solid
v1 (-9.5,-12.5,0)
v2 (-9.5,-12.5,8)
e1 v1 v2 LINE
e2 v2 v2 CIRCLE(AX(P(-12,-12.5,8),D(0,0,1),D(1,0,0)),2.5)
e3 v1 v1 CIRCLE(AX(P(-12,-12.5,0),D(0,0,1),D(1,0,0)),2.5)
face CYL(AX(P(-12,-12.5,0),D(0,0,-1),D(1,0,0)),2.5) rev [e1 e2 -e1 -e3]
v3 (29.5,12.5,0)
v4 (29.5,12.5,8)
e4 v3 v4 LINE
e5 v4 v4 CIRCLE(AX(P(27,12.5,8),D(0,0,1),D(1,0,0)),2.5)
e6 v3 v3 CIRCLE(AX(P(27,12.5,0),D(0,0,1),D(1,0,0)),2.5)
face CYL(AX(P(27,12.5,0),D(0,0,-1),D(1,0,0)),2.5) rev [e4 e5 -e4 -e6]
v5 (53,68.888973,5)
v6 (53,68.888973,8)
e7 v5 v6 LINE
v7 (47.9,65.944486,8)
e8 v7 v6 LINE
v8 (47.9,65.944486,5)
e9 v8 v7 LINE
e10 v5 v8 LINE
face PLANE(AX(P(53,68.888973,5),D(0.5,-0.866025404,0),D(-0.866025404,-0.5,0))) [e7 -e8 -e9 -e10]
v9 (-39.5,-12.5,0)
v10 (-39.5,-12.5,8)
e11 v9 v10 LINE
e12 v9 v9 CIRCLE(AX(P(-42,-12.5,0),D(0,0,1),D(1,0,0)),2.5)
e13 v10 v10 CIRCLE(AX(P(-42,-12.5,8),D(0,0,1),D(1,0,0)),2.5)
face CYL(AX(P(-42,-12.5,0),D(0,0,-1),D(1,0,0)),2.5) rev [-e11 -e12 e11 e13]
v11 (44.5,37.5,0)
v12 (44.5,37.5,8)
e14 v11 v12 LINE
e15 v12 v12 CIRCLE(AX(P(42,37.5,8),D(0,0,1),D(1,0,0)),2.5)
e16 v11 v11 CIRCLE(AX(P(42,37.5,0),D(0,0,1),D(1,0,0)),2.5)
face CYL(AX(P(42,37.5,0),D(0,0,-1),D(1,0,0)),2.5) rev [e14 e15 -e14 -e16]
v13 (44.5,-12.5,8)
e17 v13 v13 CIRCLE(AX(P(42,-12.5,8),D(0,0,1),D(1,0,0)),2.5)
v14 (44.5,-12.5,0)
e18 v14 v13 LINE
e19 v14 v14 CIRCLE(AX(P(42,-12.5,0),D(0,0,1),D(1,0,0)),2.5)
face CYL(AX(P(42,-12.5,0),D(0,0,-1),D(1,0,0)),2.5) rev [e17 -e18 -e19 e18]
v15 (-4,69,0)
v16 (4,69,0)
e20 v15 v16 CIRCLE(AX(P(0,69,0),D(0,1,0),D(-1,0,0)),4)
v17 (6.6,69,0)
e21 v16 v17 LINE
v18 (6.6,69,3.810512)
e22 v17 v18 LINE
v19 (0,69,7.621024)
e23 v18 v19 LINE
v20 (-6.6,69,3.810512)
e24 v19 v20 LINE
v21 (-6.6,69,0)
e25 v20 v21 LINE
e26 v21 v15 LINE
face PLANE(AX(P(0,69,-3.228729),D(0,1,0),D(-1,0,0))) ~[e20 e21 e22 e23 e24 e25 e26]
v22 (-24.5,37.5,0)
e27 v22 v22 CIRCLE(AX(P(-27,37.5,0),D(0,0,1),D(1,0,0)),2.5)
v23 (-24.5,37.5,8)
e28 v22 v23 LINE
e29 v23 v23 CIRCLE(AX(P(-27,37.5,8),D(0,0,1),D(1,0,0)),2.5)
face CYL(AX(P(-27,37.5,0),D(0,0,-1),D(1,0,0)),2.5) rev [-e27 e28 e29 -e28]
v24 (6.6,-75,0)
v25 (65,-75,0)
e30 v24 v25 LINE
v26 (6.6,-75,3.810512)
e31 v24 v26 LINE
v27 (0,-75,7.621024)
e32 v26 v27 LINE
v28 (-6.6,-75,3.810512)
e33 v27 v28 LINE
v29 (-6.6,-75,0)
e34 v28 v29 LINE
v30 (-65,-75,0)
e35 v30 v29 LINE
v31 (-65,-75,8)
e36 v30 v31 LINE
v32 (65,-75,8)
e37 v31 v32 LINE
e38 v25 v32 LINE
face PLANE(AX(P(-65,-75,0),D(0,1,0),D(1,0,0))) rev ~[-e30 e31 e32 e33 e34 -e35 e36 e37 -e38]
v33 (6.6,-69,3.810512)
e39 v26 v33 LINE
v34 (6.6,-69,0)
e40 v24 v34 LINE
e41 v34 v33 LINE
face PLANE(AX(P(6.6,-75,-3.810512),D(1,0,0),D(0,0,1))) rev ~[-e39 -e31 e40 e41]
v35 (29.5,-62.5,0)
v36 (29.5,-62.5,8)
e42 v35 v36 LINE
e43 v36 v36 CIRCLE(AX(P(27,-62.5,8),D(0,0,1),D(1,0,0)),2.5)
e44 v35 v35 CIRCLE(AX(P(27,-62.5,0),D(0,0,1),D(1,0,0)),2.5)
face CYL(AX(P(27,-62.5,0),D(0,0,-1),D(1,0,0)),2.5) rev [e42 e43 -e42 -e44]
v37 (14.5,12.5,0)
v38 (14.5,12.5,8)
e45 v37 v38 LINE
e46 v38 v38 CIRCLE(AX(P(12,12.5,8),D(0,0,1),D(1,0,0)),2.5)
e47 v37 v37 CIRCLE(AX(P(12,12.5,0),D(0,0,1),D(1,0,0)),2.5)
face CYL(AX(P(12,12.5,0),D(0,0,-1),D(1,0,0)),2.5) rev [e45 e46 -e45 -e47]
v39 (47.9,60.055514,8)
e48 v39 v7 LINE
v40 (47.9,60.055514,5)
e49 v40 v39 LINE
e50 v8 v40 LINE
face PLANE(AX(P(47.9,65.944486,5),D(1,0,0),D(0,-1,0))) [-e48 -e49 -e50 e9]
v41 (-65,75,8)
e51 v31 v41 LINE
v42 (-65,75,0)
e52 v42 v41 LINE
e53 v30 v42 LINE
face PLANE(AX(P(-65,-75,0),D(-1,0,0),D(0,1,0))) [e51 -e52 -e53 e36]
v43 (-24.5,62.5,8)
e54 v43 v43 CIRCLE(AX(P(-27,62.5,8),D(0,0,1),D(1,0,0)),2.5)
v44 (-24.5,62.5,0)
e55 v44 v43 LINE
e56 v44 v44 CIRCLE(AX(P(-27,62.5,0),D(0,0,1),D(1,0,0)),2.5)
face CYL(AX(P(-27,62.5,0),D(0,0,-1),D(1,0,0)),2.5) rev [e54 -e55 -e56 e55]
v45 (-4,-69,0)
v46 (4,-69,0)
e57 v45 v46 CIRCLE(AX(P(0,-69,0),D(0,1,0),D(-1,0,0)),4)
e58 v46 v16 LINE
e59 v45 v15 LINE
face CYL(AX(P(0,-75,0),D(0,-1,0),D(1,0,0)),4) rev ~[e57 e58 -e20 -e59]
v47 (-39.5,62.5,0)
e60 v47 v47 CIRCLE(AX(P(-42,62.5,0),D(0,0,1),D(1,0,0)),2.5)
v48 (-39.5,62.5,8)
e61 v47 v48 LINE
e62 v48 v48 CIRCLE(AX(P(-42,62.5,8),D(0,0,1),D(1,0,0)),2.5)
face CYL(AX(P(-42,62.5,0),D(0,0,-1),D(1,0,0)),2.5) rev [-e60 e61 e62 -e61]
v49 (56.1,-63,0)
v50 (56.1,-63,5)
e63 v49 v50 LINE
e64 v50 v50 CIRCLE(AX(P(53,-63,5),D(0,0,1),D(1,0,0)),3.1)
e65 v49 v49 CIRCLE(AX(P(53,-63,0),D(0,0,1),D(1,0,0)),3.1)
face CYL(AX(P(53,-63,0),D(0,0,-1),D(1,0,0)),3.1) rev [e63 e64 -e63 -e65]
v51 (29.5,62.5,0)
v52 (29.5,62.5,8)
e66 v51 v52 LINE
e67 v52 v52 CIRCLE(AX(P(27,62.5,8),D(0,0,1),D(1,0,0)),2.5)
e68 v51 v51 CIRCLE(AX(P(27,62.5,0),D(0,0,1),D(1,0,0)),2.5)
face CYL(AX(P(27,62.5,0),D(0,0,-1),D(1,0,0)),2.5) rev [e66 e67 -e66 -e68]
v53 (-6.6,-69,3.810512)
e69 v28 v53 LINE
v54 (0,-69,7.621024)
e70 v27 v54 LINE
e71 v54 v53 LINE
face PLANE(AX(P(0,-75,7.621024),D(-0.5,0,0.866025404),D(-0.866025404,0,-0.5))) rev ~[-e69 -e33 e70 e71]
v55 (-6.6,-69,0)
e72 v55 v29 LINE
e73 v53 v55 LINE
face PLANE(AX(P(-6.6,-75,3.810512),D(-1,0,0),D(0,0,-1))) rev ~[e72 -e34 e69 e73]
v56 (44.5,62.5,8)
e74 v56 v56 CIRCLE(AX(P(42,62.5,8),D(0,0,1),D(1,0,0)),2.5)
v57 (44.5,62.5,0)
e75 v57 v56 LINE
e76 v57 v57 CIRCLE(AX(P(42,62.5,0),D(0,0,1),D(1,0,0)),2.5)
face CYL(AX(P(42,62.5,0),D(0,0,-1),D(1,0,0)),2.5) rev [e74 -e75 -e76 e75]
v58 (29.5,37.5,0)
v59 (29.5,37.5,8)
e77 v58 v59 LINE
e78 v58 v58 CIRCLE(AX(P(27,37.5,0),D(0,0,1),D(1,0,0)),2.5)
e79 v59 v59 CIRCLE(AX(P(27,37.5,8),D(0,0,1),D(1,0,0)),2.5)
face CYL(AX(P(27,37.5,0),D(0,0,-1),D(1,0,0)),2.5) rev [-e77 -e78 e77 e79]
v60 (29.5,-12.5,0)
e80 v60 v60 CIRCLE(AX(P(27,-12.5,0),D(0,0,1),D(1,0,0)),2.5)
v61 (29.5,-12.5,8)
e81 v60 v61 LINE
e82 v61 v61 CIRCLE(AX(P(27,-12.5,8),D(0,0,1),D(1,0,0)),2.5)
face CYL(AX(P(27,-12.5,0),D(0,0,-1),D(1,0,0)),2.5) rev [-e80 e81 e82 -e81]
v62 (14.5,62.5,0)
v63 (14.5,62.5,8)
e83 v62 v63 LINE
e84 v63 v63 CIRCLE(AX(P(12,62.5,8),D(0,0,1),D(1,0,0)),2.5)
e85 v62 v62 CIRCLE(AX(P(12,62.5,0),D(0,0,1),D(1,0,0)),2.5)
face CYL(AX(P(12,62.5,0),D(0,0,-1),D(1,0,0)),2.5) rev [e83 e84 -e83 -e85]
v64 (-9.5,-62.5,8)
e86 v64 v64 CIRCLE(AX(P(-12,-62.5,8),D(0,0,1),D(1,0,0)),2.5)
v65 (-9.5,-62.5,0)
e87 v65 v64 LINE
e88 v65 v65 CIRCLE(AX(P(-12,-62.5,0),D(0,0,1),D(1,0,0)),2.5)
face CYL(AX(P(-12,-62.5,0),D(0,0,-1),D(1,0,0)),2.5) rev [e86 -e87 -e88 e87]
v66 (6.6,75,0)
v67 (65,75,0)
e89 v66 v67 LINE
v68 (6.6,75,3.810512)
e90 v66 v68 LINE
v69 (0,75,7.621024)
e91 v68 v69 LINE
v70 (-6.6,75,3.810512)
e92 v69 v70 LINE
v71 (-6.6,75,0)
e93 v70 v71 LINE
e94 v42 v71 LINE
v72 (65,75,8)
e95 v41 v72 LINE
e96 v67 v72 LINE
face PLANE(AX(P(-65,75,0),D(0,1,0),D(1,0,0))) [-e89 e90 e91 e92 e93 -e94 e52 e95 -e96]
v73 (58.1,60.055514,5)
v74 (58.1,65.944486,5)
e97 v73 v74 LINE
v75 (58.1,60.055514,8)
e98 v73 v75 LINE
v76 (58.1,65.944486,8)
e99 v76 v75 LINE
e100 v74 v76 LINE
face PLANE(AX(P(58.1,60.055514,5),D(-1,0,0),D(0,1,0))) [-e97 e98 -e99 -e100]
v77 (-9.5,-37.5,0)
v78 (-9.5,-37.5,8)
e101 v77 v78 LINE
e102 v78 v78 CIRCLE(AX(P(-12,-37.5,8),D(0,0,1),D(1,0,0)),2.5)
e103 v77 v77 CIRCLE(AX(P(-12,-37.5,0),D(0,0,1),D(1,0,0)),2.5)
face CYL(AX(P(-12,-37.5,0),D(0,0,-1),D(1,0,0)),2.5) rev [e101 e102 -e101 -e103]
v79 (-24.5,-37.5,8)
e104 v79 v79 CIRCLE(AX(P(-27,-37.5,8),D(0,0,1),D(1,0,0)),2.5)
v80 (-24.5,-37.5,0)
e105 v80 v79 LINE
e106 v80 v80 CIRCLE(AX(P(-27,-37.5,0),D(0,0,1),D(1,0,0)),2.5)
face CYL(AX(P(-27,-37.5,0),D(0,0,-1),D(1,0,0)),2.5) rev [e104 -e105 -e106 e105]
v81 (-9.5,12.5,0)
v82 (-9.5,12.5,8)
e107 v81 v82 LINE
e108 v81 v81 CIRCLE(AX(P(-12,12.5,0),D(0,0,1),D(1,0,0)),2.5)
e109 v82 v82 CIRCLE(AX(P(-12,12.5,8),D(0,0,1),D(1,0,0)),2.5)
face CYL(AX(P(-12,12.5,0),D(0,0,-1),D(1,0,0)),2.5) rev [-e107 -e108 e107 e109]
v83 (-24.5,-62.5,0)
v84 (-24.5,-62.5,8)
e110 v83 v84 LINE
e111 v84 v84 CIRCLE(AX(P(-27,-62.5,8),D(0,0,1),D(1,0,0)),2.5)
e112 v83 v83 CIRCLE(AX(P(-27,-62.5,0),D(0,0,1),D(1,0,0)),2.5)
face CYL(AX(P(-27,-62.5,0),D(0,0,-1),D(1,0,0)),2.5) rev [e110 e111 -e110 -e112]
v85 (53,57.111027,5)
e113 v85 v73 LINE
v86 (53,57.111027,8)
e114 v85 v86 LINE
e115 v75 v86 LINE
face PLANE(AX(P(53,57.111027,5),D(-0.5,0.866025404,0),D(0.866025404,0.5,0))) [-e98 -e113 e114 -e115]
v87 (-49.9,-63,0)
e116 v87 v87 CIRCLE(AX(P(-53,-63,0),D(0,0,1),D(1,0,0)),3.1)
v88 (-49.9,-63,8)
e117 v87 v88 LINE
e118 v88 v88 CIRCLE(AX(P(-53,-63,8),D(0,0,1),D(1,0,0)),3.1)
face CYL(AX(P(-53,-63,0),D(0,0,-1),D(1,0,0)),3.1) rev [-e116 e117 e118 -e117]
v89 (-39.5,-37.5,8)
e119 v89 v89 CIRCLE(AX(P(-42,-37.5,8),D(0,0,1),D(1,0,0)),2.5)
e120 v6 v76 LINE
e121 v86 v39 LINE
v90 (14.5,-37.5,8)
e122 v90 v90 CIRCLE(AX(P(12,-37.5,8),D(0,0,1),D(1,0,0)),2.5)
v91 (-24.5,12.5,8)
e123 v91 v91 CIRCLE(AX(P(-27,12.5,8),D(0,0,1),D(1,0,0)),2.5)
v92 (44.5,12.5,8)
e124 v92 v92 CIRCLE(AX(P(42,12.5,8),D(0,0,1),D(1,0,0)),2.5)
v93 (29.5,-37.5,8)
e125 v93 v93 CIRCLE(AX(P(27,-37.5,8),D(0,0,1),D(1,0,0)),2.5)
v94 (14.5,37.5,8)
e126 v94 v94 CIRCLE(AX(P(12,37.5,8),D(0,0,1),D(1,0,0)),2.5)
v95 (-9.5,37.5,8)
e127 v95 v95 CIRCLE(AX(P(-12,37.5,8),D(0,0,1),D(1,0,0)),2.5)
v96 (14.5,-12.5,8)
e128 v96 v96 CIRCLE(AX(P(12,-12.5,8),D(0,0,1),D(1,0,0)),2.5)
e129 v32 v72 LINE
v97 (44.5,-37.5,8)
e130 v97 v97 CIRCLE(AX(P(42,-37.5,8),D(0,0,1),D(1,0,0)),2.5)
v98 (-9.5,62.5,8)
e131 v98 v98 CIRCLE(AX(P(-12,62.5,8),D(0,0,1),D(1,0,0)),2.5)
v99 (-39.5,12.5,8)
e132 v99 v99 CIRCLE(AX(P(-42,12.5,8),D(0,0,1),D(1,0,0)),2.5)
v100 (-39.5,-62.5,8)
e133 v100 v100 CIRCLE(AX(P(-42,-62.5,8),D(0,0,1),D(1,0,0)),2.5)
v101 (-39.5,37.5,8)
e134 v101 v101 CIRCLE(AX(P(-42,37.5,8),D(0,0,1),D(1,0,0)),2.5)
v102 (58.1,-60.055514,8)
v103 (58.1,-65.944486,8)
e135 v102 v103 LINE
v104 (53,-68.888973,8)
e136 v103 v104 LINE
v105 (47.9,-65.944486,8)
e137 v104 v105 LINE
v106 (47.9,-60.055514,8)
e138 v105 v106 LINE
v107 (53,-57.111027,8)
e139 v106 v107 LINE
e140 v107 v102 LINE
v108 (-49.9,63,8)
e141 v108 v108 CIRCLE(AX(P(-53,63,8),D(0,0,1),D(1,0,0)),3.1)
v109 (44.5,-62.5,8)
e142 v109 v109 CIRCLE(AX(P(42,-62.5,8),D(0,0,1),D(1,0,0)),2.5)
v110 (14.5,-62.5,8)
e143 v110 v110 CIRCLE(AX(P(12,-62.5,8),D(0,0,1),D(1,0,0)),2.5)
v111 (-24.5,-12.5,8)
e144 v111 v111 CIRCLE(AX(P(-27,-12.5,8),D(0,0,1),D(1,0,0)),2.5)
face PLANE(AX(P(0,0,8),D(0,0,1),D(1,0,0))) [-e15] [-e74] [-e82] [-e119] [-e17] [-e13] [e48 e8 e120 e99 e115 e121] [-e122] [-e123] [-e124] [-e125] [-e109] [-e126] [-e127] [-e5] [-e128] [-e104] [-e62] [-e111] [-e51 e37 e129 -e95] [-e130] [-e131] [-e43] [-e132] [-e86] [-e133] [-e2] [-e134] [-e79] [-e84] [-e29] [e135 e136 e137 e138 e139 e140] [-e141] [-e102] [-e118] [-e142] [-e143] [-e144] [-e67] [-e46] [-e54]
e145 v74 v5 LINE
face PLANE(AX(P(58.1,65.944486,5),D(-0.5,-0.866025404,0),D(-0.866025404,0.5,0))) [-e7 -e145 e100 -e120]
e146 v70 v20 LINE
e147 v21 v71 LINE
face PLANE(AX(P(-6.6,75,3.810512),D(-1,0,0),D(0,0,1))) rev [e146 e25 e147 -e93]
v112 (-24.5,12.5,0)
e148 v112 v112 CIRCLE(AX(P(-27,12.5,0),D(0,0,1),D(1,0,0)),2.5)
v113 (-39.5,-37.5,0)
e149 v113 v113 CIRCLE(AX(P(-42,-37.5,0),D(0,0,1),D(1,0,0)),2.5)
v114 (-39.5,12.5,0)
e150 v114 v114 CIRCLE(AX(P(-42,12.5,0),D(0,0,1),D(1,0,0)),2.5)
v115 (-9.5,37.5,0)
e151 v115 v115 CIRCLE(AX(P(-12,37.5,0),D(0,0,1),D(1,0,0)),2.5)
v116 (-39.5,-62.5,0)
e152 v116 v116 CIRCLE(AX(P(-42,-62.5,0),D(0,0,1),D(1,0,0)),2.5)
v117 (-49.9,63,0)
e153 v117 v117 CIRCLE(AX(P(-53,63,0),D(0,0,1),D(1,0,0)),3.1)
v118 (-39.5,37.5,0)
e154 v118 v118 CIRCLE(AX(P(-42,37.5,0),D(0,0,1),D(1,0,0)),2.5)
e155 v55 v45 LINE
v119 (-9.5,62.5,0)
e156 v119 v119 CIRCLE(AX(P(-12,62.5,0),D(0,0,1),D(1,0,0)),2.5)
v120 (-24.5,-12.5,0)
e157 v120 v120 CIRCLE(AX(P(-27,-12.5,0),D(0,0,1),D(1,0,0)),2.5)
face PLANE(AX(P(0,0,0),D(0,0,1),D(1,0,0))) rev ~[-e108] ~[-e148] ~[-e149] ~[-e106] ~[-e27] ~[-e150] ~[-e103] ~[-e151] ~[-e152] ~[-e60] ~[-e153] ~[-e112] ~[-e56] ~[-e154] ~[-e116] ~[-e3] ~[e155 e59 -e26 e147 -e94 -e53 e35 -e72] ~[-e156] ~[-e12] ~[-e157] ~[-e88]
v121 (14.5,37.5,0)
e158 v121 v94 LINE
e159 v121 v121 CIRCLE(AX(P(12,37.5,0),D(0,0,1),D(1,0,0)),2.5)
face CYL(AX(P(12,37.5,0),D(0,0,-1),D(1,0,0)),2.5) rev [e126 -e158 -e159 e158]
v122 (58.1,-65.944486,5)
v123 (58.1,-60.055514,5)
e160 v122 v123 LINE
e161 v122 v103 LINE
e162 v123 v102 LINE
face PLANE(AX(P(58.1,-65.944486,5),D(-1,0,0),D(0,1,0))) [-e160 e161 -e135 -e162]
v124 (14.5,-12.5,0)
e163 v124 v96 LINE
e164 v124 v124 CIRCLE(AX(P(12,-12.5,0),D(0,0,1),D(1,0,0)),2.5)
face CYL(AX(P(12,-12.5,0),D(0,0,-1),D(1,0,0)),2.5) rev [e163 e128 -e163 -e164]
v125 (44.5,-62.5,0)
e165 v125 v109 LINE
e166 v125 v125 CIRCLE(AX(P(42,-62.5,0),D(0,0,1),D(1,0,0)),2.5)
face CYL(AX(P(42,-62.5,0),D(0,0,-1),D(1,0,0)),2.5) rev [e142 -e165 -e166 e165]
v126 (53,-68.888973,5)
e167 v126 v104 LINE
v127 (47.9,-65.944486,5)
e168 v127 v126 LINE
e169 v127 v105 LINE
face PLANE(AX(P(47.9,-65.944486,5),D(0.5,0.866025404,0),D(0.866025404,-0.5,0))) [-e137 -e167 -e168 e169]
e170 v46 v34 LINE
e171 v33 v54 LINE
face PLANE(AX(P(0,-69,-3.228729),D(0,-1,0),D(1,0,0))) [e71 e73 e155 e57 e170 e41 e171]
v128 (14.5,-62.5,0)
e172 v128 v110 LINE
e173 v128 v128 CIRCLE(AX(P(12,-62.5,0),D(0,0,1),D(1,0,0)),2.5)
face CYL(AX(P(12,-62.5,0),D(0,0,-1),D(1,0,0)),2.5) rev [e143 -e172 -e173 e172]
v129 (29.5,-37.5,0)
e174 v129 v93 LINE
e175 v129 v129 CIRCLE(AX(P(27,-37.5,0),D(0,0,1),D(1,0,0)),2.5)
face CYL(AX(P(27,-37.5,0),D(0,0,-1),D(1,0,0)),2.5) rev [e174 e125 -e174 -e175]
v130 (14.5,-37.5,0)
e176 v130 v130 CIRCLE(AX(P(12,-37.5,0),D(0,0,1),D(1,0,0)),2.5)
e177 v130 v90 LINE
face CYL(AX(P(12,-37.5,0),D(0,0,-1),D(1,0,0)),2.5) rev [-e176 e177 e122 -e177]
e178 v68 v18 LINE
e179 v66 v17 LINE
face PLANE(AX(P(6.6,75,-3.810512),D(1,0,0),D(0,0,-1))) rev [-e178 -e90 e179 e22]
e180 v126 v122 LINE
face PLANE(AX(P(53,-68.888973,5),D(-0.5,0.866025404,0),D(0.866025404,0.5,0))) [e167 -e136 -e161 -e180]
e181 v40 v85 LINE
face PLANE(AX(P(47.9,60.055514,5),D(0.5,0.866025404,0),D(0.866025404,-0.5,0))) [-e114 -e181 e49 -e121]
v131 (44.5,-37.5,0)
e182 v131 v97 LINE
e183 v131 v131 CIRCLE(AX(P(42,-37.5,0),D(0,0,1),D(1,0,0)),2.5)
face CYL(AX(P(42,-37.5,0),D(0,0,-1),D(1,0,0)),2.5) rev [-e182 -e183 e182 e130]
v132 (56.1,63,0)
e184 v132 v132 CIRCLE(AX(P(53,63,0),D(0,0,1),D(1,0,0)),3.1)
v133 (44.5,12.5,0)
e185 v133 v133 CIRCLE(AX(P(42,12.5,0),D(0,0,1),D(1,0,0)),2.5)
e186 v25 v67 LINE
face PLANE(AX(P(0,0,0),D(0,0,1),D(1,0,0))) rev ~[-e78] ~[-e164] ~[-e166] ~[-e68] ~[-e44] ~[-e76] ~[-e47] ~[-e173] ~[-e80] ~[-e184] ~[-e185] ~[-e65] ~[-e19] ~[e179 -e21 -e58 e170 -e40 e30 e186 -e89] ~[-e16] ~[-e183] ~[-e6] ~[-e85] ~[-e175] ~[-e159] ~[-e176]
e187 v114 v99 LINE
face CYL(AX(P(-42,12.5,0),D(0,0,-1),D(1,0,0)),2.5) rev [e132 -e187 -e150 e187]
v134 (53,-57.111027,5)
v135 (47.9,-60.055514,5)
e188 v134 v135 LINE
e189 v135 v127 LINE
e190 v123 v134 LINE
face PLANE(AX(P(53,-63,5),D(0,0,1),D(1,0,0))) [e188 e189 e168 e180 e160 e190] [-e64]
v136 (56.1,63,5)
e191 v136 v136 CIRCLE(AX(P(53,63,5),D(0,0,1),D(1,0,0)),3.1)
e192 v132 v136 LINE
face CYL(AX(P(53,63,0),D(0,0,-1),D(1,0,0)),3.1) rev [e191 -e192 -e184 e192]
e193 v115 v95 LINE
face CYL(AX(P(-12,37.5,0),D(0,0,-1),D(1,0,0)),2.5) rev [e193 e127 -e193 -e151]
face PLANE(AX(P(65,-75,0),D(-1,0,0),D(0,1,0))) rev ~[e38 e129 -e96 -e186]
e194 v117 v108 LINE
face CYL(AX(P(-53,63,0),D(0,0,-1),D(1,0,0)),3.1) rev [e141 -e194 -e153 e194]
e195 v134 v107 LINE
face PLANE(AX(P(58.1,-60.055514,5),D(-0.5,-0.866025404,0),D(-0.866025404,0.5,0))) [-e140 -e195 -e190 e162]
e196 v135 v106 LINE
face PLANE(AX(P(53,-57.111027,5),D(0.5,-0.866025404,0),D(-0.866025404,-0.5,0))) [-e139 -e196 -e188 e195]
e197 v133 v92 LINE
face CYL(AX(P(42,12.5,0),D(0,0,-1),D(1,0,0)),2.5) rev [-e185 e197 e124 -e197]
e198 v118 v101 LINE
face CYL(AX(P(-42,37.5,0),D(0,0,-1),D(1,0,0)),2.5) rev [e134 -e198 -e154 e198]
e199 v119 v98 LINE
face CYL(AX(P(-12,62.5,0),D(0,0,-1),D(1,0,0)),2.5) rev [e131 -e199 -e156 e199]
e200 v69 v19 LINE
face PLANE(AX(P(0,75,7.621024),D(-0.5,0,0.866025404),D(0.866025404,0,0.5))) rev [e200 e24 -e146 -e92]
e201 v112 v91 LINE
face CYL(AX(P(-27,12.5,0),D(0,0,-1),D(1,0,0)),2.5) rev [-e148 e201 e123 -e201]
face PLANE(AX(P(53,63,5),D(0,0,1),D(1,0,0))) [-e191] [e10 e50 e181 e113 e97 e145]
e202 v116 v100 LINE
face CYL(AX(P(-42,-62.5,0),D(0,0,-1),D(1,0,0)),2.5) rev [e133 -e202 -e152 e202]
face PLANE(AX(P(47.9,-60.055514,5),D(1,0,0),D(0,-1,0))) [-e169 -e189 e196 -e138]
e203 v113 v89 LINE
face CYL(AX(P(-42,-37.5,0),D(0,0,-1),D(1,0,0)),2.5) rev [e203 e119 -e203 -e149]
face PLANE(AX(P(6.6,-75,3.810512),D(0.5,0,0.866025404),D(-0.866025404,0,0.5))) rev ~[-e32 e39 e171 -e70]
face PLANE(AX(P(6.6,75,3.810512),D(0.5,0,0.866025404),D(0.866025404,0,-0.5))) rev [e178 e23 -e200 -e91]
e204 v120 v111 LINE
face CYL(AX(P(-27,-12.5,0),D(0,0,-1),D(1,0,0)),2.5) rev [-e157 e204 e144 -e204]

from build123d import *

# Parameters (mm, degrees)
F0_W     = 130
F0_H     = 150
F0_R     = 3.1
F0_R_2   = 2.5
F1_DEPTH = 8
F2_START = 5
F2_DEPTH = 20
F4_DEPTH = 150.001
F5_DEPTH = 6


# Not quite as in the source:
# - a pattern or mirror of a feature is missing from the dataset's text; its kind, count and spacing are read off the source's solid


with BuildPart() as f1:
    # F0 (on Top) → F1 (new body)
    with BuildSketch(Plane.XY):
        Rectangle(F0_W, F0_H)
        with Locations((-53, -63)):
            Circle(F0_R, mode=Mode.SUBTRACT)
        with Locations((-42, -62.5)):
            Circle(F0_R_2, mode=Mode.SUBTRACT)
        with Locations((-27, -62.5)):
            Circle(F0_R_2, mode=Mode.SUBTRACT)
        with Locations((-12, -62.5)):
            Circle(F0_R_2, mode=Mode.SUBTRACT)
        with Locations((-42, -37.5)):
            Circle(F0_R_2, mode=Mode.SUBTRACT)
        with Locations((-42, -12.5)):
            Circle(F0_R_2, mode=Mode.SUBTRACT)
        with Locations((-27, -37.5)):
            Circle(F0_R_2, mode=Mode.SUBTRACT)
        with Locations((-12, -37.5)):
            Circle(F0_R_2, mode=Mode.SUBTRACT)
        with Locations((-27, -12.5)):
            Circle(F0_R_2, mode=Mode.SUBTRACT)
        with Locations((-12, -12.5)):
            Circle(F0_R_2, mode=Mode.SUBTRACT)
        with Locations((12, -62.5)):
            Circle(F0_R_2, mode=Mode.SUBTRACT)
        with Locations((27, -62.5)):
            Circle(F0_R_2, mode=Mode.SUBTRACT)
        with Locations((42, -62.5)):
            Circle(F0_R_2, mode=Mode.SUBTRACT)
        Polygon((53, -57.1110272543), (58.1, -60.0555136271), (58.1, -65.9444863729), (53, -68.8889727457), (47.9, -65.9444863729), (47.9, -60.0555136271), align=None, mode=Mode.SUBTRACT)
        with Locations((12, -37.5)):
            Circle(F0_R_2, mode=Mode.SUBTRACT)
        with Locations((27, -37.5)):
            Circle(F0_R_2, mode=Mode.SUBTRACT)
        with Locations((12, -12.5)):
            Circle(F0_R_2, mode=Mode.SUBTRACT)
        with Locations((27, -12.5)):
            Circle(F0_R_2, mode=Mode.SUBTRACT)
        with Locations((42, -37.5)):
            Circle(F0_R_2, mode=Mode.SUBTRACT)
        with Locations((42, -12.5)):
            Circle(F0_R_2, mode=Mode.SUBTRACT)
        with Locations((-42, 12.5)):
            Circle(F0_R_2, mode=Mode.SUBTRACT)
        with Locations((-27, 12.5)):
            Circle(F0_R_2, mode=Mode.SUBTRACT)
        with Locations((-12, 12.5)):
            Circle(F0_R_2, mode=Mode.SUBTRACT)
        with Locations((-42, 37.5)):
            Circle(F0_R_2, mode=Mode.SUBTRACT)
        with Locations((-53, 63)):
            Circle(F0_R, mode=Mode.SUBTRACT)
        with Locations((-42, 62.5)):
            Circle(F0_R_2, mode=Mode.SUBTRACT)
        with Locations((-27, 37.5)):
            Circle(F0_R_2, mode=Mode.SUBTRACT)
        with Locations((-12, 37.5)):
            Circle(F0_R_2, mode=Mode.SUBTRACT)
        with Locations((-27, 62.5)):
            Circle(F0_R_2, mode=Mode.SUBTRACT)
        with Locations((-12, 62.5)):
            Circle(F0_R_2, mode=Mode.SUBTRACT)
        with Locations((12, 12.5)):
            Circle(F0_R_2, mode=Mode.SUBTRACT)
        with Locations((27, 12.5)):
            Circle(F0_R_2, mode=Mode.SUBTRACT)
        with Locations((42, 12.5)):
            Circle(F0_R_2, mode=Mode.SUBTRACT)
        with Locations((12, 37.5)):
            Circle(F0_R_2, mode=Mode.SUBTRACT)
        with Locations((27, 37.5)):
            Circle(F0_R_2, mode=Mode.SUBTRACT)
        with Locations((12, 62.5)):
            Circle(F0_R_2, mode=Mode.SUBTRACT)
        with Locations((27, 62.5)):
            Circle(F0_R_2, mode=Mode.SUBTRACT)
        with Locations((42, 37.5)):
            Circle(F0_R_2, mode=Mode.SUBTRACT)
        with Locations((42, 62.5)):
            Circle(F0_R_2, mode=Mode.SUBTRACT)
        Polygon((58.1, 65.9444863729), (58.1, 60.0555136271), (53, 57.1110272543), (47.9, 60.0555136271), (47.9, 65.9444863729), (53, 68.8889727457), align=None, mode=Mode.SUBTRACT)
        Polygon((53, 57.1110272543), (58.1, 60.0555136271), (58.1, 65.9444863729), (53, 68.8889727457), (47.9, 65.9444863729), (47.9, 60.0555136271), align=None)
        with Locations((53, 63)):
            Circle(F0_R, mode=Mode.SUBTRACT)
        Polygon((58.1, -65.9444863729), (58.1, -60.0555136271), (53, -57.1110272543), (47.9, -60.0555136271), (47.9, -65.9444863729), (53, -68.8889727457), align=None)
        with Locations((53, -63)):
            Circle(F0_R, mode=Mode.SUBTRACT)
    extrude(amount=F1_DEPTH)

    # F0 (on Top) → F2 (cut)
    with BuildSketch(Plane.XY.offset(F2_START)):
        Polygon((53, 57.1110272543), (58.1, 60.0555136271), (58.1, 65.9444863729), (53, 68.8889727457), (47.9, 65.9444863729), (47.9, 60.0555136271), align=None)
        with Locations((53, 63)):
            Circle(F0_R, mode=Mode.SUBTRACT)
        Polygon((58.1, -65.9444863729), (58.1, -60.0555136271), (53, -57.1110272543), (47.9, -60.0555136271), (47.9, -65.9444863729), (53, -68.8889727457), align=None)
        with Locations((53, -63)):
            Circle(F0_R, mode=Mode.SUBTRACT)
    extrude(amount=F2_DEPTH, mode=Mode.SUBTRACT)

    # F3 (on face) → F4 (cut, through all)
    with BuildSketch(Plane.XZ.offset(75)):
        with BuildLine():
            Line((-4, 0), (4, 0))
            ThreePointArc((4, 0), (0, 4), (-4, 0))
        make_face()
    extrude(amount=-F4_DEPTH, mode=Mode.SUBTRACT)

    # F3 (on face) → F5 (cut)
    with BuildSketch(Plane.XZ.offset(75)):
        with BuildLine():
            Line((6.6, 0), (4, 0))
            ThreePointArc((4, 0), (0, -4), (-4, 0))
            Line((-4, 0), (-6.6, 0))
            Line((-6.6, 0), (-6.6, -3.8105117767))
            Line((-6.6, -3.8105117767), (0, -7.6210235533))
            Line((0, -7.6210235533), (6.6, -3.8105117767))
            Line((6.6, -3.8105117767), (6.6, 0))
        make_face()
        with BuildLine():
            ThreePointArc((-4, 0), (0, 4), (4, 0))
            Line((4, 0), (6.6, 0))
            Line((6.6, 0), (6.6, 3.8105117767))
            Line((6.6, 3.8105117767), (0, 7.6210235533))
            Line((0, 7.6210235533), (-6.6, 3.8105117767))
            Line((-6.6, 3.8105117767), (-6.6, 0))
            Line((-6.6, 0), (-4, 0))
        make_face()
    f5 = extrude(amount=-F5_DEPTH, mode=Mode.SUBTRACT)

    # F5_copies: F5 across plane
    add(f5.mirror(Plane.ZX), mode=Mode.SUBTRACT)


solid = f1.part
